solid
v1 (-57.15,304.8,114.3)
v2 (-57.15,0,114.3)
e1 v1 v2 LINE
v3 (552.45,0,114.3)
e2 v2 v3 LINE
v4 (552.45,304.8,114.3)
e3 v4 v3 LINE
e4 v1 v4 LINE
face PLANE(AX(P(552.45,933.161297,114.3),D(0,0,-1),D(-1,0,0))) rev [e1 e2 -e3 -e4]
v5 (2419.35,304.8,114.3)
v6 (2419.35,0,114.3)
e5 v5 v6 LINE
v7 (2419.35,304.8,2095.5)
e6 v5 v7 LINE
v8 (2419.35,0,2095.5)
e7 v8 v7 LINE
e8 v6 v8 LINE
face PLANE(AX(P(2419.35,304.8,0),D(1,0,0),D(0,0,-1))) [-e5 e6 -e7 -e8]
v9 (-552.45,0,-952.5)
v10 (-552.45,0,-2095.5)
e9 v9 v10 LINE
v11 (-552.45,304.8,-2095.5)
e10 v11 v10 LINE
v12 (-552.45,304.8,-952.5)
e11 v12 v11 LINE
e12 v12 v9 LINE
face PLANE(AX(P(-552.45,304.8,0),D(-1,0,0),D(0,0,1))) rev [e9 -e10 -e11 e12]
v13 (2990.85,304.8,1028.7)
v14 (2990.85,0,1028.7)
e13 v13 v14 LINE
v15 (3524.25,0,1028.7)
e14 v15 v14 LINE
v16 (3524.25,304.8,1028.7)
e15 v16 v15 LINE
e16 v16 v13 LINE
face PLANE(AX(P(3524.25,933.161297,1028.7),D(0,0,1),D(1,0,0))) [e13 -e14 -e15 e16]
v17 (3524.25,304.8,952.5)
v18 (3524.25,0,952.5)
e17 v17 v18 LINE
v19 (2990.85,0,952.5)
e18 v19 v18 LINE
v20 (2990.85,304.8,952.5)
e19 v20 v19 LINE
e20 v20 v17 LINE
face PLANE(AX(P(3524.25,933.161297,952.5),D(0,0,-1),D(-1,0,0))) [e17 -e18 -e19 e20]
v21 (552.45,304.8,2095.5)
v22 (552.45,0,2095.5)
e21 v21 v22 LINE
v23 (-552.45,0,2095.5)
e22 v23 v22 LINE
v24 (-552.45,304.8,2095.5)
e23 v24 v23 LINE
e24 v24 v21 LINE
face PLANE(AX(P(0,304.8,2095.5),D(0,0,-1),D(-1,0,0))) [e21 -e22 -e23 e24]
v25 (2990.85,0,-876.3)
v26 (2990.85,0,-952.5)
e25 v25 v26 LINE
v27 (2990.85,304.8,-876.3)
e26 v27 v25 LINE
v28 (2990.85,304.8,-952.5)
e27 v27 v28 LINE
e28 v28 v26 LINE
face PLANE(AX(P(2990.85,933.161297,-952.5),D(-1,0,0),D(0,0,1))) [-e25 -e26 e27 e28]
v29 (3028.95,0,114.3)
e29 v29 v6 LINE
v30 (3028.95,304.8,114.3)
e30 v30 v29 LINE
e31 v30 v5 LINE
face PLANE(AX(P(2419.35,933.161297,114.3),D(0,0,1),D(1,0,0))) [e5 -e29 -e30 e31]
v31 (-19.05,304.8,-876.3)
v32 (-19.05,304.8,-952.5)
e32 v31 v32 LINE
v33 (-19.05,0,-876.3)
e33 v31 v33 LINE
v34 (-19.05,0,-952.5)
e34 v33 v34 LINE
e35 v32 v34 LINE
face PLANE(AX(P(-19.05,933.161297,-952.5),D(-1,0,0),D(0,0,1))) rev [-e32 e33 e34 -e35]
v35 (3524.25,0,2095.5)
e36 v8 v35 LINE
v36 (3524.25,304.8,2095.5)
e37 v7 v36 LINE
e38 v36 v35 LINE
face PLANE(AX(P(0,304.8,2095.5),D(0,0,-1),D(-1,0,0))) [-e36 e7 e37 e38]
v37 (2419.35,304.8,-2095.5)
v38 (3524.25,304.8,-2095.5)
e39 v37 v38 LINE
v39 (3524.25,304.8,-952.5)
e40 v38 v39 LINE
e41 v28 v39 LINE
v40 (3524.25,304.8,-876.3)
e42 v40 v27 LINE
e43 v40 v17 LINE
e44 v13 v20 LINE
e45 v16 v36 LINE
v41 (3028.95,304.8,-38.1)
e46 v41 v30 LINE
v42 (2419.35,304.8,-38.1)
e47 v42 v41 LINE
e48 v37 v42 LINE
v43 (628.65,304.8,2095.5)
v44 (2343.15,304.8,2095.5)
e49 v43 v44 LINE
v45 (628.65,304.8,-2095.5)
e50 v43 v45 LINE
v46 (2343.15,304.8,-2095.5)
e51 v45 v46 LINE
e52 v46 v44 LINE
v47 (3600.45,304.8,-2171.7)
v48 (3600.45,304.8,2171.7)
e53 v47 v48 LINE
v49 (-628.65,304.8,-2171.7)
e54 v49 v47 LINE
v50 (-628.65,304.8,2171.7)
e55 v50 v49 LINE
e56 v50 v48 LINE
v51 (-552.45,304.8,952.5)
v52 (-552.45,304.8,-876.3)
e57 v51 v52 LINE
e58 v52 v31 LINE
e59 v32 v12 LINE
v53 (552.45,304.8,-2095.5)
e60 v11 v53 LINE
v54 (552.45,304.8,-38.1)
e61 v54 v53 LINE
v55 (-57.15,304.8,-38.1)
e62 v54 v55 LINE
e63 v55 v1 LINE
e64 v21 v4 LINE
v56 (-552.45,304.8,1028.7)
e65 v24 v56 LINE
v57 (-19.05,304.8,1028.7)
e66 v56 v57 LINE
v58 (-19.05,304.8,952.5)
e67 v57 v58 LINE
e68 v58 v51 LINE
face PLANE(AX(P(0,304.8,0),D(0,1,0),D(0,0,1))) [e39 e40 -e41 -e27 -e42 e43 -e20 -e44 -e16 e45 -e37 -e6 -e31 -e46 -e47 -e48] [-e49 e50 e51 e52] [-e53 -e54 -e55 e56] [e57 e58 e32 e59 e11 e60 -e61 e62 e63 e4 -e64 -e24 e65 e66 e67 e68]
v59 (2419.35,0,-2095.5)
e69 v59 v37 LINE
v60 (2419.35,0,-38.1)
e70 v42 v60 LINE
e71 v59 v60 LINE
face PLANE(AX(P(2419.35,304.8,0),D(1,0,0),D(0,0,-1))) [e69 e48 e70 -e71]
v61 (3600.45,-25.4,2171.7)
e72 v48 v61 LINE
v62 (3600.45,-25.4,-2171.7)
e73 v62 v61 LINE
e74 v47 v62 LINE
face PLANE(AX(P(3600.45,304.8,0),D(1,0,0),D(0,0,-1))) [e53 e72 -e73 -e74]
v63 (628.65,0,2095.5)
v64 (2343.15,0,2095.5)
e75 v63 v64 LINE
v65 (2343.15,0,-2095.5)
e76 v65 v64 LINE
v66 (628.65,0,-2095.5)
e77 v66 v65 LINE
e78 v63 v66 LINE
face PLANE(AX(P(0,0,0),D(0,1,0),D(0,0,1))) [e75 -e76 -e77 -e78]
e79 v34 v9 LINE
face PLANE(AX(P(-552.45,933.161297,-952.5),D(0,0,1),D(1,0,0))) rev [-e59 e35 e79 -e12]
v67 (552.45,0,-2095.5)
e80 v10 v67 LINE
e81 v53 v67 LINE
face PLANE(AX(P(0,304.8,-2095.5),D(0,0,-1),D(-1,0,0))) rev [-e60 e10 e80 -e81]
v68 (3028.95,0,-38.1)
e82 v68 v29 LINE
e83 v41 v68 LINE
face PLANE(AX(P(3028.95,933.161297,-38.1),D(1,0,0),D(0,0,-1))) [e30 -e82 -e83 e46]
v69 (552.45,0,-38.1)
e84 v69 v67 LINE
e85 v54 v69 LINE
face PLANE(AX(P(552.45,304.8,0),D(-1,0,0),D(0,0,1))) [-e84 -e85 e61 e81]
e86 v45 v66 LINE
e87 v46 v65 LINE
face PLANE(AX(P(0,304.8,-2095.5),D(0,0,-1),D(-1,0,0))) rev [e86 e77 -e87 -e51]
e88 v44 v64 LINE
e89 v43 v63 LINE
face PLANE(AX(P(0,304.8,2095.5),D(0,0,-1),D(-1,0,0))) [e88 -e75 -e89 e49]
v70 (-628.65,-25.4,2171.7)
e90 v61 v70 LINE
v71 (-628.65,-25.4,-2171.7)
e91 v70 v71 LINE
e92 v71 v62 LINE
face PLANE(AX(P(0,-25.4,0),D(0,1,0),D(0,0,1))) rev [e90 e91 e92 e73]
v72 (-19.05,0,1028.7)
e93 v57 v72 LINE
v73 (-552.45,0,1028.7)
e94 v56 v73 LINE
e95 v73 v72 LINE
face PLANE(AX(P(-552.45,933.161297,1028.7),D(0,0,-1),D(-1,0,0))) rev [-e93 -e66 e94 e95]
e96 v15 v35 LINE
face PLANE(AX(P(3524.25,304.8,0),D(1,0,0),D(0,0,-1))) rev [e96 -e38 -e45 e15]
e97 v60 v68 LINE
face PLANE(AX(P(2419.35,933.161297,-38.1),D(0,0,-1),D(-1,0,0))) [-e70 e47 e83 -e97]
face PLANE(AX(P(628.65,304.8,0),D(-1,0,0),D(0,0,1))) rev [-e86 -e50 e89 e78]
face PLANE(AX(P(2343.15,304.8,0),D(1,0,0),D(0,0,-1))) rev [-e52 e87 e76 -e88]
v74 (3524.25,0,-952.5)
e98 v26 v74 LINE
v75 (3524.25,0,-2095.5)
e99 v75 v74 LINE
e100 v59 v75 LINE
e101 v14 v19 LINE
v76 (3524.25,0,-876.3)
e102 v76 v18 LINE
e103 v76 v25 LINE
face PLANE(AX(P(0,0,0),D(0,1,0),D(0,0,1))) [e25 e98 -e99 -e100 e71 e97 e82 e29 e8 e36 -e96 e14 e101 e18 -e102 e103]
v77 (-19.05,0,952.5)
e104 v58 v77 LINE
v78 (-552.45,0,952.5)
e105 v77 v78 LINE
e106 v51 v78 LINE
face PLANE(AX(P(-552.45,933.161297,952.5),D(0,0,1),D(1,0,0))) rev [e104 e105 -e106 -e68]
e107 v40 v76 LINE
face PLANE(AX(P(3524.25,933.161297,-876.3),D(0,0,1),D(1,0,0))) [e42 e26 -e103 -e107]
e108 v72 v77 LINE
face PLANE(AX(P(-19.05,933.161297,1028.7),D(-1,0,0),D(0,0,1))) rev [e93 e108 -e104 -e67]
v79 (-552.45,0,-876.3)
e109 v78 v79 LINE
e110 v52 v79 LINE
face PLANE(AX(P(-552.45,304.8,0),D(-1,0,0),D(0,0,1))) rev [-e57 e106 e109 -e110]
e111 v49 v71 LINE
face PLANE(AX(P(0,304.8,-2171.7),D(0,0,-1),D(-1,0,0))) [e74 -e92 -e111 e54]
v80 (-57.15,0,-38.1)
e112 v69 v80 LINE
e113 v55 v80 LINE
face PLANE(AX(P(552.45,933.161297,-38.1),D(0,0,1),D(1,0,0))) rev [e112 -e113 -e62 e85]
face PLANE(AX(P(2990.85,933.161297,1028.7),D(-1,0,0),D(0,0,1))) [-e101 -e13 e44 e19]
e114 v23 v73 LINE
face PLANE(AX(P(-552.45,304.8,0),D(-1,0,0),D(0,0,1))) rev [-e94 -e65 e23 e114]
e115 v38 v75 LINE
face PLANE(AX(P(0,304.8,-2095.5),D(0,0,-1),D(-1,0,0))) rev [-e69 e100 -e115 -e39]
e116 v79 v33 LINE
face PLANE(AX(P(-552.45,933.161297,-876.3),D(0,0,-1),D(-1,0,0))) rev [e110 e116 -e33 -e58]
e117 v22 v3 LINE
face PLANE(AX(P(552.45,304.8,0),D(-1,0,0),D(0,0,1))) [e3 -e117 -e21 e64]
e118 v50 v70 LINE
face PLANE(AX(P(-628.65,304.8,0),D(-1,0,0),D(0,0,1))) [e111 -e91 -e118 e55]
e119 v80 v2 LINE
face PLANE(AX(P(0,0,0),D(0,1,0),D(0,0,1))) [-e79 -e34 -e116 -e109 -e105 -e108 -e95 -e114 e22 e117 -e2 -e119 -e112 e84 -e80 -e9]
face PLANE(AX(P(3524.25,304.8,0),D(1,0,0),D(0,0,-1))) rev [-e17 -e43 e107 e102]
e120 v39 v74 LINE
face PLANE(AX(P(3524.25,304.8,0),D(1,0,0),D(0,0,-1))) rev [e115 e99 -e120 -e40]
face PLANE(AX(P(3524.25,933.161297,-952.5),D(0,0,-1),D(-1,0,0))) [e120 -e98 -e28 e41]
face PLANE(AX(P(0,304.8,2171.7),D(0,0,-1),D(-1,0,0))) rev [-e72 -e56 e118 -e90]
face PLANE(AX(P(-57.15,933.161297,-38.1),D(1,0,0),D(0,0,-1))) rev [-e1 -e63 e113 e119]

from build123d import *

# Parameters (mm, degrees)
EXTRUDE_THIN1_OUTLINE_W   = 4229.1
EXTRUDE_THIN1_OUTLINE_H   = 4343.4
EXTRUDE_THIN1_OUTLINE_W_2 = 1104.9
EXTRUDE_THIN1_OUTLINE_H_2 = 4191
EXTRUDE_THIN1_OUTLINE_W_3 = 1714.5
EXTRUDE_THIN1_DEPTH       = 304.8
SKETCH2_W                 = 4229.1
SKETCH2_H                 = 4343.4
BOSS_EXTRUDE2_DEPTH       = 25.4
SKETCH3_W                 = 533.4
SKETCH3_H                 = 76.2
SKETCH3_W_2               = 609.6
SKETCH3_H_2               = 152.4
BOSS_EXTRUDE3_DEPTH       = 304.8


# Read off the part's stored shape, not the designer's step: Extrude-Thin1
with BuildPart() as part:
    # Extrude-Thin1 outline → Extrude-Thin1 (new body)
    with BuildSketch(Plane(origin=(0, 0, 0), x_dir=(1, 0, 0), z_dir=(0, 1, 0))):
        with Locations((1485.9, 0)):
            Rectangle(EXTRUDE_THIN1_OUTLINE_W, EXTRUDE_THIN1_OUTLINE_H)
        Rectangle(EXTRUDE_THIN1_OUTLINE_W_2, EXTRUDE_THIN1_OUTLINE_H_2, mode=Mode.SUBTRACT)
        with Locations((1485.9, 0)):
            Rectangle(EXTRUDE_THIN1_OUTLINE_W_3, EXTRUDE_THIN1_OUTLINE_H_2, mode=Mode.SUBTRACT)
        with Locations((2971.8, 0)):
            Rectangle(EXTRUDE_THIN1_OUTLINE_W_2, EXTRUDE_THIN1_OUTLINE_H_2, mode=Mode.SUBTRACT)
    extrude(amount=EXTRUDE_THIN1_DEPTH)

    # Sketch2 → Boss-Extrude2 (add)
    with BuildSketch(Plane.XZ):
        with Locations((1485.9, 0)):
            Rectangle(SKETCH2_W, SKETCH2_H)
    extrude(amount=BOSS_EXTRUDE2_DEPTH)

    # Sketch3 → Boss-Extrude3 (add)
    with BuildSketch(Plane(origin=(0, 0, 0), x_dir=(1, 0, 0), z_dir=(0, 1, 0))):
        with Locations((-285.75, -990.6)):
            Rectangle(SKETCH3_W, SKETCH3_H)
        with Locations((-285.75, 914.4)):
            Rectangle(SKETCH3_W, SKETCH3_H)
        with Locations((247.65, -38.1)):
            Rectangle(SKETCH3_W_2, SKETCH3_H_2)
    boss_extrude3 = extrude(amount=BOSS_EXTRUDE3_DEPTH)

    # Mirror1: Boss-Extrude3 across plane
    add(boss_extrude3.mirror(Plane.ZY.offset(-1485.9)))


solid = part.part
